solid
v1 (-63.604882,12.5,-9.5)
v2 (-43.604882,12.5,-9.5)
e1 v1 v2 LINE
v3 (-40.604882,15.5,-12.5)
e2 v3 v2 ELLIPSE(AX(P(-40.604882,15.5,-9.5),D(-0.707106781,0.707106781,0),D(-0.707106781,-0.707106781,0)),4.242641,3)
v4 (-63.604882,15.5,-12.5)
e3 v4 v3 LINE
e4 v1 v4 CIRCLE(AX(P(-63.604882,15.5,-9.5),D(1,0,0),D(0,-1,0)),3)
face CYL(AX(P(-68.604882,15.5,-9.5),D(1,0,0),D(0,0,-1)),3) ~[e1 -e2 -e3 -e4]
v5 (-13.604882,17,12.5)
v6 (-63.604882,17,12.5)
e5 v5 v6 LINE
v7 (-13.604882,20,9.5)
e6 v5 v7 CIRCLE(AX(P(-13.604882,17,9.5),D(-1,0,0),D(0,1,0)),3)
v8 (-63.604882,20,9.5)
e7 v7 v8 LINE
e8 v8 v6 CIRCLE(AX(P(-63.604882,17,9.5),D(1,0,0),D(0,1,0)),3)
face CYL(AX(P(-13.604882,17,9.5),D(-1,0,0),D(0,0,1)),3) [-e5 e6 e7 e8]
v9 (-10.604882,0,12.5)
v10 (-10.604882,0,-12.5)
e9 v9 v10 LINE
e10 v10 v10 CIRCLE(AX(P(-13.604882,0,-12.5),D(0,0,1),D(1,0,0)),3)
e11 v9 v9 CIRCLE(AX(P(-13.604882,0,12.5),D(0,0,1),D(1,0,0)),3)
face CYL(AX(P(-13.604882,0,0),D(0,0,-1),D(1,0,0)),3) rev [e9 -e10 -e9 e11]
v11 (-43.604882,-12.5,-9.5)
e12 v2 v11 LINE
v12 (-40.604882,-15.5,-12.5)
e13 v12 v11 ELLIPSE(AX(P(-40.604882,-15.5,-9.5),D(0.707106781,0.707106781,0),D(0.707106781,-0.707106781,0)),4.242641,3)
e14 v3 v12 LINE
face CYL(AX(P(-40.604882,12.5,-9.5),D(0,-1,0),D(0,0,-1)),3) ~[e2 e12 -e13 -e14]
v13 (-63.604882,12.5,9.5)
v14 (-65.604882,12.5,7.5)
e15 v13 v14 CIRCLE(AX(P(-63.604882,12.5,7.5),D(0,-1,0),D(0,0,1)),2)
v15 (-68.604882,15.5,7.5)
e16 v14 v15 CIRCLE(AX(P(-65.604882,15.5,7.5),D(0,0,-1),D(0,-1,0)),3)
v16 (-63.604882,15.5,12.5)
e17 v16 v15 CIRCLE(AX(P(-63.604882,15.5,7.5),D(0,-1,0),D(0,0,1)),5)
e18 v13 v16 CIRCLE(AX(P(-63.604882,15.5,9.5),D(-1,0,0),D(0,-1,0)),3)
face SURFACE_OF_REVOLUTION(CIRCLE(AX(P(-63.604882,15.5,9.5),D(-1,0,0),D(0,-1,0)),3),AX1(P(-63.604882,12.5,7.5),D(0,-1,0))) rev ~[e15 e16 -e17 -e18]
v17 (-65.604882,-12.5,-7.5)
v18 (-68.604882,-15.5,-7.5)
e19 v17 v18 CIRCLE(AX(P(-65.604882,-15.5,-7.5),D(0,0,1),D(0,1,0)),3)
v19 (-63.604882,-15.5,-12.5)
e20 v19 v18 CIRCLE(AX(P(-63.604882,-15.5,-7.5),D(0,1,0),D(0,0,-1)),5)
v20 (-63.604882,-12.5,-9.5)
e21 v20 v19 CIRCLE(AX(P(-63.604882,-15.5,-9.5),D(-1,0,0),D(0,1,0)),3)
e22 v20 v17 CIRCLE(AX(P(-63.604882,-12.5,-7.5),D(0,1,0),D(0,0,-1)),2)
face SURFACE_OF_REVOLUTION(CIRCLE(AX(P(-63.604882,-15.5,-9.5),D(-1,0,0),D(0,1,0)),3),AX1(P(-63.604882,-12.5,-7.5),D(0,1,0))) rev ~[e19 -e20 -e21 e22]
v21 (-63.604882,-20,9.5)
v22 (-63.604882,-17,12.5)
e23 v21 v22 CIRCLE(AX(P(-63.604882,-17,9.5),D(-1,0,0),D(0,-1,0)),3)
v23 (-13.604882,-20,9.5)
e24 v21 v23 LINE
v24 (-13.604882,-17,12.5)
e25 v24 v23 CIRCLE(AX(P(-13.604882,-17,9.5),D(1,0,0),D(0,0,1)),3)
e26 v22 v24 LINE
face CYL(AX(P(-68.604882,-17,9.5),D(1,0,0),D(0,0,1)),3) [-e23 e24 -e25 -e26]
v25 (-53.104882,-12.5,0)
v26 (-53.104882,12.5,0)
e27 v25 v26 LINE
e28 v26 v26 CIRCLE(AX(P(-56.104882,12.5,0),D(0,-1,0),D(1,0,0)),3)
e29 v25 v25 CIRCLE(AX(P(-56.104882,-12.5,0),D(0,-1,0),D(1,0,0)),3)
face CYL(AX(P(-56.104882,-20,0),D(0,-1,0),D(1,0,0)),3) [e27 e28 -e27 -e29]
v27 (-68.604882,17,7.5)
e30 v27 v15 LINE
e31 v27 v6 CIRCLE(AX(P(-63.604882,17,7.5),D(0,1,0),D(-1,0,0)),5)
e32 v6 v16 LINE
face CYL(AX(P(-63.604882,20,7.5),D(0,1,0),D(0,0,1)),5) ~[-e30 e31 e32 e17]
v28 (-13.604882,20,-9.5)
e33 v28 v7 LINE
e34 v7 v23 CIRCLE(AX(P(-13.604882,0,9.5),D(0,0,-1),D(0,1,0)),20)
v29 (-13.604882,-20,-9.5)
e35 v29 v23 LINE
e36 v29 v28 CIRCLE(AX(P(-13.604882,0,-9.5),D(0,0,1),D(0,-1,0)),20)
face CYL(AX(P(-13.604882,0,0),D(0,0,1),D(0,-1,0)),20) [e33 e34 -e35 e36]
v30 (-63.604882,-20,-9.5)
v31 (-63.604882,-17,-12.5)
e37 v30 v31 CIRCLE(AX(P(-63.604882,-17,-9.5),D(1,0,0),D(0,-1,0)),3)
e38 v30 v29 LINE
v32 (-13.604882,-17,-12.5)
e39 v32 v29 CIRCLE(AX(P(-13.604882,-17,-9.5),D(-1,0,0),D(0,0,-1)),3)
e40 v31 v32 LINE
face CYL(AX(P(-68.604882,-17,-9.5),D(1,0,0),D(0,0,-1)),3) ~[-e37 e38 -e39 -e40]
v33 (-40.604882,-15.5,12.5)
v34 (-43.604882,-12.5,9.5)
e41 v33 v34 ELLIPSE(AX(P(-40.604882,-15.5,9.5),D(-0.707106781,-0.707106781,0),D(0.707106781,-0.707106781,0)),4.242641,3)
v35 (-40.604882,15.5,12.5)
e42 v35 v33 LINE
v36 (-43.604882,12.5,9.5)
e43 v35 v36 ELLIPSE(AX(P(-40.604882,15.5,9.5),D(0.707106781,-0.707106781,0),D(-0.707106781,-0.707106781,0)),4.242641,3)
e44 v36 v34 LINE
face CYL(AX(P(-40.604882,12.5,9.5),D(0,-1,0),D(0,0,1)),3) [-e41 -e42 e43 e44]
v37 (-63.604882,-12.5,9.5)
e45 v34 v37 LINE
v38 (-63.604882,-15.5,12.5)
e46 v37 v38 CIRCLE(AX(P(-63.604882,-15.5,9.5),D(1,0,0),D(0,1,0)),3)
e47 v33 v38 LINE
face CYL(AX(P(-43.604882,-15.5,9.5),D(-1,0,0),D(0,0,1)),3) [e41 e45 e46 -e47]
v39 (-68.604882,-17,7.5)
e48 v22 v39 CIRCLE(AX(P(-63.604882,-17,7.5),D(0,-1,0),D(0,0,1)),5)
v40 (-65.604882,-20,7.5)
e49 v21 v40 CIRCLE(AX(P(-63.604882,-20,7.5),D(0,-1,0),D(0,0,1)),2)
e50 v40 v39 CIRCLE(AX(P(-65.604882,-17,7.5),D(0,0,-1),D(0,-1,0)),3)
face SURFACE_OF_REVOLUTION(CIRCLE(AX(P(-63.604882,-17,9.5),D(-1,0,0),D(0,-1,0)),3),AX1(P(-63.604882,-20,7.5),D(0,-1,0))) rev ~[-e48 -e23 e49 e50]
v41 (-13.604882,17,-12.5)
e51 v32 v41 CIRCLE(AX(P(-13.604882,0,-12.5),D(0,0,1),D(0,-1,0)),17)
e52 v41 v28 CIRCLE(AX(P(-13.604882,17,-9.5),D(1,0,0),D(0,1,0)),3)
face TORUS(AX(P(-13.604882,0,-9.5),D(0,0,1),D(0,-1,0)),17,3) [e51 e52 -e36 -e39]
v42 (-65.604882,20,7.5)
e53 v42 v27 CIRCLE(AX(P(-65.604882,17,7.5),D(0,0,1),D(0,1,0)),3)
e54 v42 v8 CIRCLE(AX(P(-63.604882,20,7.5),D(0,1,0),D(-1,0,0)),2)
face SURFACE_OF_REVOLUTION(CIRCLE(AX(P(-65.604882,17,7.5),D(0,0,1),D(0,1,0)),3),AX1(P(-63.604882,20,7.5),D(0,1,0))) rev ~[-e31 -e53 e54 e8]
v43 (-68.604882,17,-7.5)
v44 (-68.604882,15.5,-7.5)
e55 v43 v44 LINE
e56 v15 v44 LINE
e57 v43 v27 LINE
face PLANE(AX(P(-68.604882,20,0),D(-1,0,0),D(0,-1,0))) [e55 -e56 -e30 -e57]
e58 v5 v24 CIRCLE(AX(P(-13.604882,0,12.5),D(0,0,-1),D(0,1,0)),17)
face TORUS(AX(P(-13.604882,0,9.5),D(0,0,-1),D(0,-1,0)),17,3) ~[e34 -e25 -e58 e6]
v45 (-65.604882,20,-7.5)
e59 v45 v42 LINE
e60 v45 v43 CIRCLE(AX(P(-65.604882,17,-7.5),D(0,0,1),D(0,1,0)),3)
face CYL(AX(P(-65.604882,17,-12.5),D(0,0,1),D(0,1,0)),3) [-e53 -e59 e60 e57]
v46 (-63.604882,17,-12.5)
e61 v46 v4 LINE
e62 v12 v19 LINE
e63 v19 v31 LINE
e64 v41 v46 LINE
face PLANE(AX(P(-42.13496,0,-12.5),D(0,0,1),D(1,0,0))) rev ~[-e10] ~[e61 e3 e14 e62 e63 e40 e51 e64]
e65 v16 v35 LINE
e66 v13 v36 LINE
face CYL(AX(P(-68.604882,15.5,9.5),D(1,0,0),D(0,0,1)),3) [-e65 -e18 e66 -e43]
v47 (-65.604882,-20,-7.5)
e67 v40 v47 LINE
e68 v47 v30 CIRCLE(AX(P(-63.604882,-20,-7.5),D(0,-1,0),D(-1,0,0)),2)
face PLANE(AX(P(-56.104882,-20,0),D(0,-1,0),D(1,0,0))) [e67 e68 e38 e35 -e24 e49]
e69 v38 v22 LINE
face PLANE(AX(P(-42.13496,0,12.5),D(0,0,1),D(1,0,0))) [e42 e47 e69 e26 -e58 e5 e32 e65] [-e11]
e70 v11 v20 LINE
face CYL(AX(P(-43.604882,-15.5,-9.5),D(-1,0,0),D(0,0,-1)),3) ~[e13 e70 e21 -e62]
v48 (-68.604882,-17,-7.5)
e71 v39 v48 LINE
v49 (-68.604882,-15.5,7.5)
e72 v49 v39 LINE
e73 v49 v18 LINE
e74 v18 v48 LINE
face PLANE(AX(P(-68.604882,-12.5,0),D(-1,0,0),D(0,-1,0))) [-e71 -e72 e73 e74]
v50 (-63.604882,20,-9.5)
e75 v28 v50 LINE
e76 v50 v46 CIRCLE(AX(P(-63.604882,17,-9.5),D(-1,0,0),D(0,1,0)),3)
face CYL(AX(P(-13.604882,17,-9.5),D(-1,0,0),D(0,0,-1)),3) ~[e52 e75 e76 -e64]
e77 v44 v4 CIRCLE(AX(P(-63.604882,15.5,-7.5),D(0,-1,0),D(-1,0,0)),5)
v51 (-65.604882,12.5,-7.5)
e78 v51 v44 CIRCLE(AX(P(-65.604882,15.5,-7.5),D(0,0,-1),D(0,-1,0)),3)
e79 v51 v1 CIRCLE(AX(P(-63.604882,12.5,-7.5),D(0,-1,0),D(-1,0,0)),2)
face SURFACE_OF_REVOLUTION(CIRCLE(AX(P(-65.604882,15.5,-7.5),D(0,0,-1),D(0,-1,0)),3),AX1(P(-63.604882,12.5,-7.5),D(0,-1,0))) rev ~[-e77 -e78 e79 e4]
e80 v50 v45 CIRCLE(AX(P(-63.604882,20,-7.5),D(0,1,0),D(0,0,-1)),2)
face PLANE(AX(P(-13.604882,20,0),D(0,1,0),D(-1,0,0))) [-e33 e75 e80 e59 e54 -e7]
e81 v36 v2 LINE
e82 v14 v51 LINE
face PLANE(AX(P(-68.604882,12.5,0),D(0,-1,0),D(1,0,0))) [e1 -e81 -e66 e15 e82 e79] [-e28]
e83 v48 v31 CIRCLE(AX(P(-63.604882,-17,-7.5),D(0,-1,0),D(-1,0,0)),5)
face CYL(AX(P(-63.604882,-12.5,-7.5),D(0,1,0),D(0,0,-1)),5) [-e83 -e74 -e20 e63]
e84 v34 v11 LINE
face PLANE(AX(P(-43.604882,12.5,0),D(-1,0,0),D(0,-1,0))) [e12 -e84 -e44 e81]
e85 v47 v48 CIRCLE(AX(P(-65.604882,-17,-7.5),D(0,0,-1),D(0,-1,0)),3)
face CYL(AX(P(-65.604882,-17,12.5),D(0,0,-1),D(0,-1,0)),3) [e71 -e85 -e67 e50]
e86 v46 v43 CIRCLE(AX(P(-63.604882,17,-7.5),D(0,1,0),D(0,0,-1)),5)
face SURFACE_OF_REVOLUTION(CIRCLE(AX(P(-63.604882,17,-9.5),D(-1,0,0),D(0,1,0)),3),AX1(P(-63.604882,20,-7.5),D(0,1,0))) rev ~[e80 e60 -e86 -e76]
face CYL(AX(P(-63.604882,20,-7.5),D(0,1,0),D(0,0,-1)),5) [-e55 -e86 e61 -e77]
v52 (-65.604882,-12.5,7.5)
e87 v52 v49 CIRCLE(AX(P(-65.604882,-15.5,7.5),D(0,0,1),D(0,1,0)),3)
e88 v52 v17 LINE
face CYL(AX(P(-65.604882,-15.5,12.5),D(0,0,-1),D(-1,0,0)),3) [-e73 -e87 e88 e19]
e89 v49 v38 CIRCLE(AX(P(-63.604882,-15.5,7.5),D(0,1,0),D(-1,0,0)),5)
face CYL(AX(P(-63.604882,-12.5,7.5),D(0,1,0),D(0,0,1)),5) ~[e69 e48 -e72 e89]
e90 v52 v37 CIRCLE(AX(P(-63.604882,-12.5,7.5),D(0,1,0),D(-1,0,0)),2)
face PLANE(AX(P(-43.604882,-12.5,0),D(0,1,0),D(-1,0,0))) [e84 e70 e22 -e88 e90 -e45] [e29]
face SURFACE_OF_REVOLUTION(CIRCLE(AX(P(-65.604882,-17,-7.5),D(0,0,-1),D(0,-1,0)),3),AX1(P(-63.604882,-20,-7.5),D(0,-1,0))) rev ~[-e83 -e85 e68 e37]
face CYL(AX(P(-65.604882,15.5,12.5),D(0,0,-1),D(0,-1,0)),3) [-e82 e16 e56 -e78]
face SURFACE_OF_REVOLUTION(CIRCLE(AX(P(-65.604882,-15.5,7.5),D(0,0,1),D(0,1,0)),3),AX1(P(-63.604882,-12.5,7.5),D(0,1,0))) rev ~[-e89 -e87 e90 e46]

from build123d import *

# Parameters (mm, degrees)
F0_R         = 3
F1_DEPTH     = 12.5
F2_R         = 3
F3_DEPTH     = 40
F4_R         = 3
F5_T1_DEPTH  = 7.5
F5_T3_DEPTH  = 7.5
F5_T6_ANGLE  = 90
F5_T8_ANGLE  = 90
F5_T10_ANGLE = 90
F5_T12_ANGLE = 90
F5_T14_ANGLE = 90
F5_T16_ANGLE = 90
F5_T18_ANGLE = 90
F5_T20_ANGLE = 90


# Not quite as in the source:
# - a fillet or chamfer that OpenCascade refuses, or shapes differently, is made with other operations: its cross-section is extruded or revolved along the edge and cut away or added


with BuildPart() as f1:
    # F0 (on Top) → F1 (new body, symmetric)
    with BuildSketch(Plane.XY):
        with BuildLine():
            Line((-68.6048818245, -20), (-13.6048818245, -20))
            ThreePointArc((-13.6048818245, -20), (-33.6048818245, 0), (-13.6048818245, 20))
            Line((-13.6048818245, 20), (-68.6048818245, 20))
            Line((-68.6048818245, 20), (-68.6048818245, 12.5))
            Line((-68.6048818245, 12.5), (-43.6048818245, 12.5))
            Line((-43.6048818245, 12.5), (-43.6048818245, -12.5))
            Line((-43.6048818245, -12.5), (-68.6048818245, -12.5))
            Line((-68.6048818245, -12.5), (-68.6048818245, -20))
        make_face()
        with BuildLine():
            ThreePointArc((-13.6048818245, 20), (-33.6048818245, 0), (-13.6048818245, -20))
            ThreePointArc((-13.6048818245, -20), (0.5372537993, -14.1421356237), (6.3951181755, 0))
            ThreePointArc((6.3951181755, 0), (0.5372537993, 14.1421356237), (-13.6048818245, 20))
        make_face()
        with Locations((-13.6048818245, 0)):
            Circle(F0_R, mode=Mode.SUBTRACT)
    extrude(amount=F1_DEPTH, both=True)

    # F2 (on face) → F3 (join, through all)
    with BuildSketch(Plane.XZ.offset(20)):
        with Locations((-56.1048818245, 0)):
            Circle(F2_R)
    extrude(amount=-F3_DEPTH)

    # F4
    f4_edges = [f1.edges().sort_by_distance(p)[0] for p in [
        (-41.104882, 20, 12.5),
        (-43.604882, 0, 12.5),
        (-56.104882, 12.5, 12.5),
        (-56.104882, -12.5, 12.5),
        (6.395118, 0, -12.5),
        (-43.604882, 0, -12.5),
        (-68.604882, -12.5, 0),
        (-68.604882, 12.5, 0),
        (-56.104882, 12.5, -12.5),
        (-56.104882, -12.5, -12.5),
        (-68.604882, -20, 0),
        (-68.604882, 20, 0),
        (-41.104882, -20, -12.5),
        (-41.104882, -20, 12.5),
        (-41.104882, 20, -12.5),
        (6.395118, 0, 12.5),
    ]]
    fillet(f4_edges, radius=F4_R)

    # F5: fillet of radius 5 on 4 edges, made by hand

    # F5_s2 → F5_t1 (cut)
    with BuildSketch(Plane.XZ.offset(-20)):
        with BuildLine():
            ThreePointArc((-63.6048818245, 12.5), (-67.1404157304, 11.0355339059), (-68.6048818245, 7.5))
            Line((-68.6048818245, 7.5), (-68.6048818245, 12.5))
            Line((-68.6048818245, 12.5), (-63.6048818245, 12.5))
        make_face()
        with BuildLine():
            ThreePointArc((-63.6048818245, -12.5), (-67.1404157304, -11.0355339059), (-68.6048818245, -7.5))
            Line((-68.6048818245, -7.5), (-68.6048818245, -12.5))
            Line((-68.6048818245, -12.5), (-63.6048818245, -12.5))
        make_face()
    extrude(amount=F5_T1_DEPTH, mode=Mode.SUBTRACT)

    # F5_s4 → F5_t3 (cut)
    with BuildSketch(Plane.XZ.offset(12.5)):
        with BuildLine():
            ThreePointArc((-63.6048818245, -12.5), (-67.1404157304, -11.0355339059), (-68.6048818245, -7.5))
            Line((-68.6048818245, -7.5), (-68.6048818245, -12.5))
            Line((-68.6048818245, -12.5), (-63.6048818245, -12.5))
        make_face()
        with BuildLine():
            ThreePointArc((-63.6048818245, 12.5), (-67.1404157304, 11.0355339059), (-68.6048818245, 7.5))
            Line((-68.6048818245, 7.5), (-68.6048818245, 12.5))
            Line((-68.6048818245, 12.5), (-63.6048818245, 12.5))
        make_face()
    extrude(amount=F5_T3_DEPTH, mode=Mode.SUBTRACT)

    # F5_s5 → F5_t6 (revolve, cut)
    with BuildSketch(Plane.XY.offset(7.5)):
        with BuildLine():
            ThreePointArc((-65.6048818245, -12.5), (-67.726202168, -13.3786796564), (-68.6048818245, -15.5))
            Line((-68.6048818245, -15.5), (-68.6048818245, -12.5))
            Line((-68.6048818245, -12.5), (-65.6048818245, -12.5))
        make_face()
    revolve(axis=Axis((-63.6048818245, -12.5, 7.5), (0, 1, 0)), revolution_arc=F5_T6_ANGLE, mode=Mode.SUBTRACT)

    # F5_s7 → F5_t8 (revolve, cut)
    with BuildSketch(Plane.YZ.offset(-63.6048818245)):
        with BuildLine():
            ThreePointArc((-20, 9.5), (-19.1213203436, 11.6213203436), (-17, 12.5))
            Line((-17, 12.5), (-20, 12.5))
            Line((-20, 12.5), (-20, 9.5))
        make_face()
    revolve(axis=Axis((-63.6048818245, -20, 7.5), (0, -1, 0)), revolution_arc=F5_T8_ANGLE, mode=Mode.SUBTRACT)

    # F5_s9 → F5_t10 (revolve, cut)
    with BuildSketch(Plane.YZ.offset(-63.6048818245)):
        with BuildLine():
            ThreePointArc((-12.5, -9.5), (-13.3786796564, -11.6213203436), (-15.5, -12.5))
            Line((-15.5, -12.5), (-12.5, -12.5))
            Line((-12.5, -12.5), (-12.5, -9.5))
        make_face()
    revolve(axis=Axis((-63.6048818245, -12.5, -7.5), (0, 1, 0)), revolution_arc=F5_T10_ANGLE, mode=Mode.SUBTRACT)

    # F5_s11 → F5_t12 (revolve, cut)
    with BuildSketch(Plane.XY.offset(-7.5)):
        with BuildLine():
            ThreePointArc((-65.6048818245, -20), (-67.726202168, -19.1213203436), (-68.6048818245, -17))
            Line((-68.6048818245, -17), (-68.6048818245, -20))
            Line((-68.6048818245, -20), (-65.6048818245, -20))
        make_face()
    revolve(axis=Axis((-63.6048818245, -20, -7.5), (0, -1, 0)), revolution_arc=F5_T12_ANGLE, mode=Mode.SUBTRACT)

    # F5_s13 → F5_t14 (revolve, cut)
    with BuildSketch(Plane.YZ.offset(-63.6048818245)):
        with BuildLine():
            ThreePointArc((20, -9.5), (19.1213203436, -11.6213203436), (17, -12.5))
            Line((17, -12.5), (20, -12.5))
            Line((20, -12.5), (20, -9.5))
        make_face()
    revolve(axis=Axis((-63.6048818245, 20, -7.5), (0, 1, 0)), revolution_arc=F5_T14_ANGLE, mode=Mode.SUBTRACT)

    # F5_s15 → F5_t16 (revolve, cut)
    with BuildSketch(Plane.XY.offset(-7.5)):
        with BuildLine():
            ThreePointArc((-65.6048818245, 12.5), (-67.726202168, 13.3786796564), (-68.6048818245, 15.5))
            Line((-68.6048818245, 15.5), (-68.6048818245, 12.5))
            Line((-68.6048818245, 12.5), (-65.6048818245, 12.5))
        make_face()
    revolve(axis=Axis((-63.6048818245, 12.5, -7.5), (0, -1, 0)), revolution_arc=F5_T16_ANGLE, mode=Mode.SUBTRACT)

    # F5_s17 → F5_t18 (revolve, cut)
    with BuildSketch(Plane.XY.offset(7.5)):
        with BuildLine():
            ThreePointArc((-65.6048818245, 20), (-67.726202168, 19.1213203436), (-68.6048818245, 17))
            Line((-68.6048818245, 17), (-68.6048818245, 20))
            Line((-68.6048818245, 20), (-65.6048818245, 20))
        make_face()
    revolve(axis=Axis((-63.6048818245, 20, 7.5), (0, 1, 0)), revolution_arc=F5_T18_ANGLE, mode=Mode.SUBTRACT)

    # F5_s19 → F5_t20 (revolve, cut)
    with BuildSketch(Plane.YZ.offset(-63.6048818245)):
        with BuildLine():
            ThreePointArc((12.5, 9.5), (13.3786796564, 11.6213203436), (15.5, 12.5))
            Line((15.5, 12.5), (12.5, 12.5))
            Line((12.5, 12.5), (12.5, 9.5))
        make_face()
    revolve(axis=Axis((-63.6048818245, 12.5, 7.5), (0, -1, 0)), revolution_arc=F5_T20_ANGLE, mode=Mode.SUBTRACT)


solid = f1.part
